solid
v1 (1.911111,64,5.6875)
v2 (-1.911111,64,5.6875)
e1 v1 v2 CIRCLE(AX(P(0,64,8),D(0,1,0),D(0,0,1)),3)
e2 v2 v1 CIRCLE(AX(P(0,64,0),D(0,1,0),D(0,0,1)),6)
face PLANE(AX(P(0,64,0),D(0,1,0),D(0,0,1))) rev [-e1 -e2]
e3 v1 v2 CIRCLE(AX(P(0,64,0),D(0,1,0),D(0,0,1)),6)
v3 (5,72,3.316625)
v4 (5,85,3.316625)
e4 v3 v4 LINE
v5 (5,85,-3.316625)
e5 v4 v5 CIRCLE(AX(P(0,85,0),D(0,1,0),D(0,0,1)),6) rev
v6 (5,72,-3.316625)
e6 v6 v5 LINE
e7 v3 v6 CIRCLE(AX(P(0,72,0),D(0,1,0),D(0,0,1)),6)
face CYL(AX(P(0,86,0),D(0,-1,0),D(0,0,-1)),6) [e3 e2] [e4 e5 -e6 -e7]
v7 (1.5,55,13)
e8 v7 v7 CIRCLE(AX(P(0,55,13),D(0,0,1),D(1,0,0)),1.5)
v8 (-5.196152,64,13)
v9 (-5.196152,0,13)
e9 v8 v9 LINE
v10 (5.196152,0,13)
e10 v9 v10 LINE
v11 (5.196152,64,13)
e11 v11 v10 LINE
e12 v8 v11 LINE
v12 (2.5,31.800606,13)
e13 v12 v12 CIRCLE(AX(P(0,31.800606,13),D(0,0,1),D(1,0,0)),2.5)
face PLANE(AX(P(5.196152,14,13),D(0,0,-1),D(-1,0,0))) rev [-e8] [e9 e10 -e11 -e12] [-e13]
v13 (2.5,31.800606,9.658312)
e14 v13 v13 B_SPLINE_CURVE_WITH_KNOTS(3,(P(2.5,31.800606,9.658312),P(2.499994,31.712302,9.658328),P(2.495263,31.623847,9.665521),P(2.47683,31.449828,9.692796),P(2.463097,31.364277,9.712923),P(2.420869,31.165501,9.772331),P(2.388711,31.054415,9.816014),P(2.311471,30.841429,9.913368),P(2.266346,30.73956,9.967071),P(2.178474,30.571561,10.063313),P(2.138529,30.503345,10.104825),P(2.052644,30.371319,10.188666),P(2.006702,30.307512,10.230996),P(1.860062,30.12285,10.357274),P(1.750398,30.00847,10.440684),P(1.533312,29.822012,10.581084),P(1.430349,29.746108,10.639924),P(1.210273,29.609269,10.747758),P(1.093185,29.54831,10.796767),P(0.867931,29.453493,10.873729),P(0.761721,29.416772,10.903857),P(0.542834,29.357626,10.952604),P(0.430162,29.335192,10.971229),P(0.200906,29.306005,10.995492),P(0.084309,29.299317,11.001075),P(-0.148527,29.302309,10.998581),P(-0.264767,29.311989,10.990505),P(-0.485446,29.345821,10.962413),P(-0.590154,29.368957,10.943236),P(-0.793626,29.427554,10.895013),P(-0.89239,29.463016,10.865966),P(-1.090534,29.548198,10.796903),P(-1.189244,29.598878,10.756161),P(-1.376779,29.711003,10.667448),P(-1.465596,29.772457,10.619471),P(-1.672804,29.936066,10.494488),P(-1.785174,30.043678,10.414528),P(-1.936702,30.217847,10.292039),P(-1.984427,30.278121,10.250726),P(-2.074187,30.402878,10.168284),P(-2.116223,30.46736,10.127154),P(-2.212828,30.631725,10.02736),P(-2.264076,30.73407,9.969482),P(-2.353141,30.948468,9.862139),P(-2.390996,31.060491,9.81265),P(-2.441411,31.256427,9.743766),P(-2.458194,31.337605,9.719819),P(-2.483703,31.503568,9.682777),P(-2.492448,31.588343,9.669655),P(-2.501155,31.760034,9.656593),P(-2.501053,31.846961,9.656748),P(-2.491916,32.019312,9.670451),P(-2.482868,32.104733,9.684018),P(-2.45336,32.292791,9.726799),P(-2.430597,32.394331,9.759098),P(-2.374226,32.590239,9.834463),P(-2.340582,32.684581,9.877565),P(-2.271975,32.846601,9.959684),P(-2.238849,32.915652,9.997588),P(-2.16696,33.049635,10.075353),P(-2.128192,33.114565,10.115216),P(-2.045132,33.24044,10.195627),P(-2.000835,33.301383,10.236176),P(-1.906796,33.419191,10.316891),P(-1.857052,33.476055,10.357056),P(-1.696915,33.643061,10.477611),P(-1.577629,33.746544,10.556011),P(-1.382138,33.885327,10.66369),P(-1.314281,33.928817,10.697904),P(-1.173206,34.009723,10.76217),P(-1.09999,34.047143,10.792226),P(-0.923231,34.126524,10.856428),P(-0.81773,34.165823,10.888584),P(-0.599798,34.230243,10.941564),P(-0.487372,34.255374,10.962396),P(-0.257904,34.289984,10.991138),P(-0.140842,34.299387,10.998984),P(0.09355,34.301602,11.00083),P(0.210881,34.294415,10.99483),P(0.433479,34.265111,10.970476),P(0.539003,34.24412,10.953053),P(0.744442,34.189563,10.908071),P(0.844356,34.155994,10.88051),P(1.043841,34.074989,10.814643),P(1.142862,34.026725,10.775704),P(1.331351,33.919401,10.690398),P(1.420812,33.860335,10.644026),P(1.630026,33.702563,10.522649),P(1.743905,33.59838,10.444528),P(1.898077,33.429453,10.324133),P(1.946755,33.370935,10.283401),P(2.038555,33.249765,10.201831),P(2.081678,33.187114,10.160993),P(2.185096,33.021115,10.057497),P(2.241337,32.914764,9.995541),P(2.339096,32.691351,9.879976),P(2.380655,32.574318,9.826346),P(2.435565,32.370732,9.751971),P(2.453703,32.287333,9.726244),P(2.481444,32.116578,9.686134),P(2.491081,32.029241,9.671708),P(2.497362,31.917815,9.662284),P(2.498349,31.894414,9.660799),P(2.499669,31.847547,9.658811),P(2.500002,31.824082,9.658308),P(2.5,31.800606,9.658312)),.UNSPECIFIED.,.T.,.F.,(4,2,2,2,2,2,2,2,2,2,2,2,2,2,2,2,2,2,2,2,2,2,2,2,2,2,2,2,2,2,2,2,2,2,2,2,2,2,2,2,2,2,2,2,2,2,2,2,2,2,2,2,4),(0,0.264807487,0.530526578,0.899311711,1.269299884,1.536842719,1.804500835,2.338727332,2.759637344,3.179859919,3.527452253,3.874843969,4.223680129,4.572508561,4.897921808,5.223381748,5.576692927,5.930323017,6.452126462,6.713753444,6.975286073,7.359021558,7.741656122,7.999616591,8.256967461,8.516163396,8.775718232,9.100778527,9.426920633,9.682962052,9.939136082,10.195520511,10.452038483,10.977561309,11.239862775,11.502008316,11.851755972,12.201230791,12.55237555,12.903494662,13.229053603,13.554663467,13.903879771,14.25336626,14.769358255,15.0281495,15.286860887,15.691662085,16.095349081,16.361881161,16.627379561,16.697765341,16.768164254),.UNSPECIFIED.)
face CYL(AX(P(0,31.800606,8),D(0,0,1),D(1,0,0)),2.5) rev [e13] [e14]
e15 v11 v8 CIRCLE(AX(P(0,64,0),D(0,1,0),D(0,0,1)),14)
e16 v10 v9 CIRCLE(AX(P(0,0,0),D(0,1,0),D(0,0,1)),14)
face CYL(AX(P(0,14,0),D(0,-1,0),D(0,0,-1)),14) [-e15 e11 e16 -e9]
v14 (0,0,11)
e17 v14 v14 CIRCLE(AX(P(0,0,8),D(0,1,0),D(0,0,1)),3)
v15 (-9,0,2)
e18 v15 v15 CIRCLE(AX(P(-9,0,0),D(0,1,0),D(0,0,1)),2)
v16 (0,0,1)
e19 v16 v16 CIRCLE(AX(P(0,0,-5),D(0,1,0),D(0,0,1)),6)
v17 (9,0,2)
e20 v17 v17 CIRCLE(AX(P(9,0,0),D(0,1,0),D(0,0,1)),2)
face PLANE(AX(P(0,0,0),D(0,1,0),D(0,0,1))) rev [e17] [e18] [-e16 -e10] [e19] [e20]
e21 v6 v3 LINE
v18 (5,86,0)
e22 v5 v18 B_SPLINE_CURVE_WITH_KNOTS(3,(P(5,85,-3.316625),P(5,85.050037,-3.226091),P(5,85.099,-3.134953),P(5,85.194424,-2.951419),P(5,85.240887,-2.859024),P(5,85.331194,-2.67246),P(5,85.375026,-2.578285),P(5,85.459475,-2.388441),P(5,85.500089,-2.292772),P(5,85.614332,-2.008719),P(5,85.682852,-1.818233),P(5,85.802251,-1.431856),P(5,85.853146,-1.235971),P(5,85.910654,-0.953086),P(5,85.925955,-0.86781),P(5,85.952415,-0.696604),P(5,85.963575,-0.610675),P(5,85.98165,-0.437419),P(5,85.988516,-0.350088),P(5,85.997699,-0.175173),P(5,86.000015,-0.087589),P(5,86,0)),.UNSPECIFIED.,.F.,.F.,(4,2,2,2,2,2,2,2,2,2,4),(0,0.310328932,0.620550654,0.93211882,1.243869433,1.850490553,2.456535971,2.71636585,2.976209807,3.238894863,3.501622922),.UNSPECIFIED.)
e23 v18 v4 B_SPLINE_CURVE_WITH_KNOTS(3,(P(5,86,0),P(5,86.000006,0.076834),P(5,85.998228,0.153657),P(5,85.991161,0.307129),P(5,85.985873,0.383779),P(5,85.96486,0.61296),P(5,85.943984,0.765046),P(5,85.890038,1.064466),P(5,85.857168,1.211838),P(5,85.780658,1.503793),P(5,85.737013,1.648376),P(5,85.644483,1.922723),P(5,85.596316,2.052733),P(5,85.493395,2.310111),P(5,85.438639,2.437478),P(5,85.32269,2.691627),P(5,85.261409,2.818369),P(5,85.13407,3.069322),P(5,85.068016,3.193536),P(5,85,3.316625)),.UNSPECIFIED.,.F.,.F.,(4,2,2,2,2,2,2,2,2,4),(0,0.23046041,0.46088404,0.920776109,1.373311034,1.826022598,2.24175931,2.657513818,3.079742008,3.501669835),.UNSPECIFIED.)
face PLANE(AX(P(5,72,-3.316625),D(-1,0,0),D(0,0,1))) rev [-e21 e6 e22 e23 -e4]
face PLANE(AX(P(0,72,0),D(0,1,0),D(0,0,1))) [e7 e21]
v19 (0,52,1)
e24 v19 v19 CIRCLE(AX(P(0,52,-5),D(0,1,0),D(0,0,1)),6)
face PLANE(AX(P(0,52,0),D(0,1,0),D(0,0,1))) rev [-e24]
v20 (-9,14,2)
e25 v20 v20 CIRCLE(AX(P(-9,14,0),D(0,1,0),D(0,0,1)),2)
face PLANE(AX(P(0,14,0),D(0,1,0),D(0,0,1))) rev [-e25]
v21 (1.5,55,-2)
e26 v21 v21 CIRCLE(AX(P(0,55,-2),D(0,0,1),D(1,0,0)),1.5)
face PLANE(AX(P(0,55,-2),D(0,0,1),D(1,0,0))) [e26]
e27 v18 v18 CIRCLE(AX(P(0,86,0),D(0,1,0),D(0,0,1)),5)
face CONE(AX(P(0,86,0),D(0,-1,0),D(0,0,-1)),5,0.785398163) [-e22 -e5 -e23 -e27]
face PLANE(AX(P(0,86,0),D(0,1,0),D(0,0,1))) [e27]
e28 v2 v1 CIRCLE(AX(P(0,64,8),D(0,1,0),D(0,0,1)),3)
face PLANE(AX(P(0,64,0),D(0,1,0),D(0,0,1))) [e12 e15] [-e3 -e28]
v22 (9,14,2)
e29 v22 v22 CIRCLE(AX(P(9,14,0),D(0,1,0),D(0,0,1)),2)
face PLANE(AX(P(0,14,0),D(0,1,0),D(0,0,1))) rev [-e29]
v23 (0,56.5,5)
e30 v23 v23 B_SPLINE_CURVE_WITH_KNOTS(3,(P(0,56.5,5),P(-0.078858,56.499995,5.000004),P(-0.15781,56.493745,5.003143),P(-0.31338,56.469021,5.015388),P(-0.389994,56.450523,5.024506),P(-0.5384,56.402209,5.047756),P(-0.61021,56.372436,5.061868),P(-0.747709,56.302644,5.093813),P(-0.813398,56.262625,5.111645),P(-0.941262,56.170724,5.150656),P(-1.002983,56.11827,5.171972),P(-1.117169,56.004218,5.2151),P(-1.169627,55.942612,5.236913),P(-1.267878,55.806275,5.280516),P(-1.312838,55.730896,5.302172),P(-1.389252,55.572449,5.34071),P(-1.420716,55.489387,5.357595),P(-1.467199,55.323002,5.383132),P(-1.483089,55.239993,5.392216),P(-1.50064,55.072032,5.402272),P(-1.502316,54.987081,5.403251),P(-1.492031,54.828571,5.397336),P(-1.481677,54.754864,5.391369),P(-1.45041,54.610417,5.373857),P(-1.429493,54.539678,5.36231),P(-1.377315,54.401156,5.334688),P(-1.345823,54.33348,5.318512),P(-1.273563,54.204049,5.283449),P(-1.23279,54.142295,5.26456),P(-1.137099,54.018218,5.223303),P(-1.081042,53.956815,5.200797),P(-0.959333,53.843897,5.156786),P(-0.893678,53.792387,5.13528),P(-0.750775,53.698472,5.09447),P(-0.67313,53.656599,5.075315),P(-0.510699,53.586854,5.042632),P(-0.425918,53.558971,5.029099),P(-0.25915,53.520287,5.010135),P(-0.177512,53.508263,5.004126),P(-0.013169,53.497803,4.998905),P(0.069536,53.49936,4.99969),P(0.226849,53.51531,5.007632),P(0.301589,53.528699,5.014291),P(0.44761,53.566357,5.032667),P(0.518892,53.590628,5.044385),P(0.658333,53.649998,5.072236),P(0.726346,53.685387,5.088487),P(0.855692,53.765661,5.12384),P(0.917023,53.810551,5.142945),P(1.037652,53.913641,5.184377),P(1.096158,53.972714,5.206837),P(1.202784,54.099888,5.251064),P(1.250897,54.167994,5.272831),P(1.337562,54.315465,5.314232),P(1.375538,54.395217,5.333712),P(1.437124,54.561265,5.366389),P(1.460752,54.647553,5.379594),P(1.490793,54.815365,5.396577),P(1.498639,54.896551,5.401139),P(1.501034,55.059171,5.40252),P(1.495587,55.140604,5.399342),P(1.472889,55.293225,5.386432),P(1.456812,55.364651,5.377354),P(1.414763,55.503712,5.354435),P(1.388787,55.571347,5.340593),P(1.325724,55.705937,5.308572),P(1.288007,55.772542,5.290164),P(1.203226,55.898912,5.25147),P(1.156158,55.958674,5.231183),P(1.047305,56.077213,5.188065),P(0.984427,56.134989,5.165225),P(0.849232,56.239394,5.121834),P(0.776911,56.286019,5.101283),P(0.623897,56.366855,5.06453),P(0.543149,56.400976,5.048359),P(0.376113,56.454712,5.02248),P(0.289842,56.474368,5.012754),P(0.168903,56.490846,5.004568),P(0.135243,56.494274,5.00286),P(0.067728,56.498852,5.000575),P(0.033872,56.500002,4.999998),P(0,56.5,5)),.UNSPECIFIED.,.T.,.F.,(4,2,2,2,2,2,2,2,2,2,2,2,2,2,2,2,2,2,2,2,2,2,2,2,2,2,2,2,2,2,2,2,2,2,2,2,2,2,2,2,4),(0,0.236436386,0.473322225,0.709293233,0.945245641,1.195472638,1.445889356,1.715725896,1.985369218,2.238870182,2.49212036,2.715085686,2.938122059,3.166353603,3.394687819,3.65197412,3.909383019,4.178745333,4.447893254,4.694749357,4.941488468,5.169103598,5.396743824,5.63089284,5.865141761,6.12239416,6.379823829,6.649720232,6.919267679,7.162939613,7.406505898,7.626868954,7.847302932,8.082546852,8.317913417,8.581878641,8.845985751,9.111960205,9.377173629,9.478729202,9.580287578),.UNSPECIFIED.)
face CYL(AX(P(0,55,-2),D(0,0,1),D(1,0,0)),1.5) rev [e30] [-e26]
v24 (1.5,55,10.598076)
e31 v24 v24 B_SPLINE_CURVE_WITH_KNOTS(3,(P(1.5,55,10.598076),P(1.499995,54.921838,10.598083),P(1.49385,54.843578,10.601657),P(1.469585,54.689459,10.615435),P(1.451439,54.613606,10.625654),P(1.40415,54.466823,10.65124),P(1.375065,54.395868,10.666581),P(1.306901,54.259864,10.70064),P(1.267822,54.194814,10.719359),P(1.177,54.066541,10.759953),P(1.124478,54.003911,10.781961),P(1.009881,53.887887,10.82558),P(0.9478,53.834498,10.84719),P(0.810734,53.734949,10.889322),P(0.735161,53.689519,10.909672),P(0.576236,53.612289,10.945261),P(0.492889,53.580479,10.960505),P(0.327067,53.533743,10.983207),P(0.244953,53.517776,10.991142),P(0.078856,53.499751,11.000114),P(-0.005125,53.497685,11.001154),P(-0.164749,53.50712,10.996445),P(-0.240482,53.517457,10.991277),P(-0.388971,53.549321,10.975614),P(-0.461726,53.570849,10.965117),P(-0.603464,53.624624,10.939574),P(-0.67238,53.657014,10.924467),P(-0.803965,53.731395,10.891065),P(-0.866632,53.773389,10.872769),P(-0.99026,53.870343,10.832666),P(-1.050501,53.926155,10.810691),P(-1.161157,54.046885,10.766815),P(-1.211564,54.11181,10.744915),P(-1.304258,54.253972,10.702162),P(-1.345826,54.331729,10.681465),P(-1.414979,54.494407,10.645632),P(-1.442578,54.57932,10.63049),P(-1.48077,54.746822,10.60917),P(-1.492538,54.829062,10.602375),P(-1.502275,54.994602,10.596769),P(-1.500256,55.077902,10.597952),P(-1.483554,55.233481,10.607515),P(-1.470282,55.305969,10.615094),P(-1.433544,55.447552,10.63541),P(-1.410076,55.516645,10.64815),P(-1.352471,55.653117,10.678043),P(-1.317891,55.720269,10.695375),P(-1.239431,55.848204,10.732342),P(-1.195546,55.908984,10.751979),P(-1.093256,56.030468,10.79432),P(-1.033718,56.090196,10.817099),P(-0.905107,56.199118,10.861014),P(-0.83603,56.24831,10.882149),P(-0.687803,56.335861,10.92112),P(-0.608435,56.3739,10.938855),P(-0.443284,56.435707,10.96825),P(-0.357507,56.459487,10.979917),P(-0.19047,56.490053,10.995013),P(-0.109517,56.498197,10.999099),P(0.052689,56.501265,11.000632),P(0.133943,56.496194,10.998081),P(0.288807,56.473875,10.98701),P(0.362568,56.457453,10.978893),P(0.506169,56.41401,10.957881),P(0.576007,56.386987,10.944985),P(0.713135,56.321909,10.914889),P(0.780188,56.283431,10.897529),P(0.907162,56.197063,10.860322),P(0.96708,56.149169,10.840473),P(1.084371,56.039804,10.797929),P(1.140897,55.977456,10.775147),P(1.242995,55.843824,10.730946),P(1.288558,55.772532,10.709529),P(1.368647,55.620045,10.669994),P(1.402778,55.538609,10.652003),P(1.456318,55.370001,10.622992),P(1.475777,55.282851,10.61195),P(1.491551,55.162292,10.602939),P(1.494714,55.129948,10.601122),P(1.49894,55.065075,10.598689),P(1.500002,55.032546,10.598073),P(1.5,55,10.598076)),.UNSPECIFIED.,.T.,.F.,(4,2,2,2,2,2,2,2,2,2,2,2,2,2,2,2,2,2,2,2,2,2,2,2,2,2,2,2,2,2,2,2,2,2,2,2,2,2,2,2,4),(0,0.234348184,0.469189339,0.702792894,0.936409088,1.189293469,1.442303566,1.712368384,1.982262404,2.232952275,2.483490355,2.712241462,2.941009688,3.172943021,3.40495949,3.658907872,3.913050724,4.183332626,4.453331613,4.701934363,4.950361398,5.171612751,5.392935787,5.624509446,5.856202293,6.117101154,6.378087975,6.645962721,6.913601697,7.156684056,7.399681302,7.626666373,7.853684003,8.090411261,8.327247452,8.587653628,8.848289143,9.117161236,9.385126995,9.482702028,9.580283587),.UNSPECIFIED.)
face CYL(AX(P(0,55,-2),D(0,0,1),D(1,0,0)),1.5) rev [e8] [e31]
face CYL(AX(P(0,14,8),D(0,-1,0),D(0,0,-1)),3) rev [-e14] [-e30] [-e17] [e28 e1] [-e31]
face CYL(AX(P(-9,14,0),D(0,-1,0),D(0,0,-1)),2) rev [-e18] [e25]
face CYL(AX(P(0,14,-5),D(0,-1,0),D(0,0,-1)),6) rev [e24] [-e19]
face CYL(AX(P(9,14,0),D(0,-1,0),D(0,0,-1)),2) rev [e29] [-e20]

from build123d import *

# Parameters (mm, degrees)
SKETCH1_R           = 2
SKETCH1_R_2         = 6
SKETCH1_R_3         = 3
BOSS_EXTRUDE1_DEPTH = 14
SKETCH2_R           = 6
SKETCH2_R_2         = 3
BOSS_EXTRUDE2_DEPTH = 38
SKETCH3_R           = 3
BOSS_EXTRUDE3_DEPTH = 12
SKETCH4_R           = 6
BOSS_EXTRUDE4_DEPTH = 22
CUT_EXTRUDE1_START  = -14
CUT_EXTRUDE1_DEPTH  = 14
CHAMFER1_SIZE       = 1
SKETCH6_R           = 2.5
CUT_EXTRUDE2_DEPTH  = 5
SKETCH7_R           = 1.5
CUT_EXTRUDE3_DEPTH  = 15


with BuildPart() as part:
    # Sketch1 → Boss-Extrude1 (new body)
    with BuildSketch(Plane(origin=(0, 0, 0), x_dir=(1, 0, 0), z_dir=(0, 1, 0))):
        with BuildLine():
            Line((5.196152423, -13), (-5.196152423, -13))
            ThreePointArc((-5.196152423, -13), (0, 14), (5.196152423, -13))
        make_face()
        with Locations(Location((-9, 0, 0), (0, 0, 270))):
            Circle(SKETCH1_R, mode=Mode.SUBTRACT)
        with Locations(Location((9, 0, 0), (0, 0, 270))):
            Circle(SKETCH1_R, mode=Mode.SUBTRACT)
        with Locations(Location((0, 5, 0), (0, 0, 270))):
            Circle(SKETCH1_R_2, mode=Mode.SUBTRACT)
        with Locations(Location((0, -8, 0), (0, 0, 270))):
            Circle(SKETCH1_R_3, mode=Mode.SUBTRACT)
    extrude(amount=BOSS_EXTRUDE1_DEPTH)

    # Sketch2 → Boss-Extrude2 (add)
    with BuildSketch(Plane(origin=(0, 14, 0), x_dir=(1, 0, 0), z_dir=(0, 1, 0))):
        with BuildLine():
            Line((-5.196152423, -13), (5.196152423, -13))
            ThreePointArc((5.196152423, -13), (0, 14), (-5.196152423, -13))
        make_face()
        with Locations(Location((0, 5, 0), (0, 0, 270))):
            Circle(SKETCH2_R, mode=Mode.SUBTRACT)
        with Locations(Location((0, -8, 0), (0, 0, 270))):
            Circle(SKETCH2_R_2, mode=Mode.SUBTRACT)
    extrude(amount=BOSS_EXTRUDE2_DEPTH)

    # Sketch3 → Boss-Extrude3 (add)
    with BuildSketch(Plane(origin=(0, 52, 0), x_dir=(1, 0, 0), z_dir=(0, 1, 0))):
        with BuildLine():
            Line((-5.196152423, -13), (5.196152423, -13))
            ThreePointArc((5.196152423, -13), (0, 14), (-5.196152423, -13))
        make_face()
        with Locations(Location((0, -8, 0), (0, 0, 270))):
            Circle(SKETCH3_R, mode=Mode.SUBTRACT)
    extrude(amount=BOSS_EXTRUDE3_DEPTH)

    # Sketch4 → Boss-Extrude4 (add)
    with BuildSketch(Plane(origin=(0, 64, 0), x_dir=(1, 0, 0), z_dir=(0, 1, 0))):
        with Locations(Location((0, 0, 0), (0, 0, 251.426650281))):
            Circle(SKETCH4_R)
    extrude(amount=BOSS_EXTRUDE4_DEPTH)

    # Sketch5 → Cut-Extrude1 (cut)
    with BuildSketch(Plane(origin=(0, 86, 0), x_dir=(1, 0, 0), z_dir=(0, 1, 0)).offset(CUT_EXTRUDE1_START)):
        with BuildLine():
            Line((5, 3.31662479), (5, -3.31662479))
            ThreePointArc((5, -3.31662479), (6, 0), (5, 3.31662479))
        make_face()
    extrude(amount=CUT_EXTRUDE1_DEPTH, mode=Mode.SUBTRACT)

    # Chamfer1
    chamfer1_edges = [part.edges().sort_by_distance(p)[0] for p in [
        (-4.759608727, 86, -3.653234836),
    ]]
    chamfer(chamfer1_edges, length=CHAMFER1_SIZE - 0.0001)  # a hair under: the kernel refuses the full size

    # Sketch6 → Cut-Extrude2 (cut)
    with BuildSketch(Plane.XY.offset(13)):
        with Locations((0, 31.800606355)):
            Circle(SKETCH6_R)
    extrude(amount=-CUT_EXTRUDE2_DEPTH, mode=Mode.SUBTRACT)

    # Sketch7 → Cut-Extrude3 (cut)
    with BuildSketch(Plane.XY.offset(13)):
        with Locations((0, 55)):
            Circle(SKETCH7_R)
    extrude(amount=-CUT_EXTRUDE3_DEPTH, mode=Mode.SUBTRACT)


solid = part.part
